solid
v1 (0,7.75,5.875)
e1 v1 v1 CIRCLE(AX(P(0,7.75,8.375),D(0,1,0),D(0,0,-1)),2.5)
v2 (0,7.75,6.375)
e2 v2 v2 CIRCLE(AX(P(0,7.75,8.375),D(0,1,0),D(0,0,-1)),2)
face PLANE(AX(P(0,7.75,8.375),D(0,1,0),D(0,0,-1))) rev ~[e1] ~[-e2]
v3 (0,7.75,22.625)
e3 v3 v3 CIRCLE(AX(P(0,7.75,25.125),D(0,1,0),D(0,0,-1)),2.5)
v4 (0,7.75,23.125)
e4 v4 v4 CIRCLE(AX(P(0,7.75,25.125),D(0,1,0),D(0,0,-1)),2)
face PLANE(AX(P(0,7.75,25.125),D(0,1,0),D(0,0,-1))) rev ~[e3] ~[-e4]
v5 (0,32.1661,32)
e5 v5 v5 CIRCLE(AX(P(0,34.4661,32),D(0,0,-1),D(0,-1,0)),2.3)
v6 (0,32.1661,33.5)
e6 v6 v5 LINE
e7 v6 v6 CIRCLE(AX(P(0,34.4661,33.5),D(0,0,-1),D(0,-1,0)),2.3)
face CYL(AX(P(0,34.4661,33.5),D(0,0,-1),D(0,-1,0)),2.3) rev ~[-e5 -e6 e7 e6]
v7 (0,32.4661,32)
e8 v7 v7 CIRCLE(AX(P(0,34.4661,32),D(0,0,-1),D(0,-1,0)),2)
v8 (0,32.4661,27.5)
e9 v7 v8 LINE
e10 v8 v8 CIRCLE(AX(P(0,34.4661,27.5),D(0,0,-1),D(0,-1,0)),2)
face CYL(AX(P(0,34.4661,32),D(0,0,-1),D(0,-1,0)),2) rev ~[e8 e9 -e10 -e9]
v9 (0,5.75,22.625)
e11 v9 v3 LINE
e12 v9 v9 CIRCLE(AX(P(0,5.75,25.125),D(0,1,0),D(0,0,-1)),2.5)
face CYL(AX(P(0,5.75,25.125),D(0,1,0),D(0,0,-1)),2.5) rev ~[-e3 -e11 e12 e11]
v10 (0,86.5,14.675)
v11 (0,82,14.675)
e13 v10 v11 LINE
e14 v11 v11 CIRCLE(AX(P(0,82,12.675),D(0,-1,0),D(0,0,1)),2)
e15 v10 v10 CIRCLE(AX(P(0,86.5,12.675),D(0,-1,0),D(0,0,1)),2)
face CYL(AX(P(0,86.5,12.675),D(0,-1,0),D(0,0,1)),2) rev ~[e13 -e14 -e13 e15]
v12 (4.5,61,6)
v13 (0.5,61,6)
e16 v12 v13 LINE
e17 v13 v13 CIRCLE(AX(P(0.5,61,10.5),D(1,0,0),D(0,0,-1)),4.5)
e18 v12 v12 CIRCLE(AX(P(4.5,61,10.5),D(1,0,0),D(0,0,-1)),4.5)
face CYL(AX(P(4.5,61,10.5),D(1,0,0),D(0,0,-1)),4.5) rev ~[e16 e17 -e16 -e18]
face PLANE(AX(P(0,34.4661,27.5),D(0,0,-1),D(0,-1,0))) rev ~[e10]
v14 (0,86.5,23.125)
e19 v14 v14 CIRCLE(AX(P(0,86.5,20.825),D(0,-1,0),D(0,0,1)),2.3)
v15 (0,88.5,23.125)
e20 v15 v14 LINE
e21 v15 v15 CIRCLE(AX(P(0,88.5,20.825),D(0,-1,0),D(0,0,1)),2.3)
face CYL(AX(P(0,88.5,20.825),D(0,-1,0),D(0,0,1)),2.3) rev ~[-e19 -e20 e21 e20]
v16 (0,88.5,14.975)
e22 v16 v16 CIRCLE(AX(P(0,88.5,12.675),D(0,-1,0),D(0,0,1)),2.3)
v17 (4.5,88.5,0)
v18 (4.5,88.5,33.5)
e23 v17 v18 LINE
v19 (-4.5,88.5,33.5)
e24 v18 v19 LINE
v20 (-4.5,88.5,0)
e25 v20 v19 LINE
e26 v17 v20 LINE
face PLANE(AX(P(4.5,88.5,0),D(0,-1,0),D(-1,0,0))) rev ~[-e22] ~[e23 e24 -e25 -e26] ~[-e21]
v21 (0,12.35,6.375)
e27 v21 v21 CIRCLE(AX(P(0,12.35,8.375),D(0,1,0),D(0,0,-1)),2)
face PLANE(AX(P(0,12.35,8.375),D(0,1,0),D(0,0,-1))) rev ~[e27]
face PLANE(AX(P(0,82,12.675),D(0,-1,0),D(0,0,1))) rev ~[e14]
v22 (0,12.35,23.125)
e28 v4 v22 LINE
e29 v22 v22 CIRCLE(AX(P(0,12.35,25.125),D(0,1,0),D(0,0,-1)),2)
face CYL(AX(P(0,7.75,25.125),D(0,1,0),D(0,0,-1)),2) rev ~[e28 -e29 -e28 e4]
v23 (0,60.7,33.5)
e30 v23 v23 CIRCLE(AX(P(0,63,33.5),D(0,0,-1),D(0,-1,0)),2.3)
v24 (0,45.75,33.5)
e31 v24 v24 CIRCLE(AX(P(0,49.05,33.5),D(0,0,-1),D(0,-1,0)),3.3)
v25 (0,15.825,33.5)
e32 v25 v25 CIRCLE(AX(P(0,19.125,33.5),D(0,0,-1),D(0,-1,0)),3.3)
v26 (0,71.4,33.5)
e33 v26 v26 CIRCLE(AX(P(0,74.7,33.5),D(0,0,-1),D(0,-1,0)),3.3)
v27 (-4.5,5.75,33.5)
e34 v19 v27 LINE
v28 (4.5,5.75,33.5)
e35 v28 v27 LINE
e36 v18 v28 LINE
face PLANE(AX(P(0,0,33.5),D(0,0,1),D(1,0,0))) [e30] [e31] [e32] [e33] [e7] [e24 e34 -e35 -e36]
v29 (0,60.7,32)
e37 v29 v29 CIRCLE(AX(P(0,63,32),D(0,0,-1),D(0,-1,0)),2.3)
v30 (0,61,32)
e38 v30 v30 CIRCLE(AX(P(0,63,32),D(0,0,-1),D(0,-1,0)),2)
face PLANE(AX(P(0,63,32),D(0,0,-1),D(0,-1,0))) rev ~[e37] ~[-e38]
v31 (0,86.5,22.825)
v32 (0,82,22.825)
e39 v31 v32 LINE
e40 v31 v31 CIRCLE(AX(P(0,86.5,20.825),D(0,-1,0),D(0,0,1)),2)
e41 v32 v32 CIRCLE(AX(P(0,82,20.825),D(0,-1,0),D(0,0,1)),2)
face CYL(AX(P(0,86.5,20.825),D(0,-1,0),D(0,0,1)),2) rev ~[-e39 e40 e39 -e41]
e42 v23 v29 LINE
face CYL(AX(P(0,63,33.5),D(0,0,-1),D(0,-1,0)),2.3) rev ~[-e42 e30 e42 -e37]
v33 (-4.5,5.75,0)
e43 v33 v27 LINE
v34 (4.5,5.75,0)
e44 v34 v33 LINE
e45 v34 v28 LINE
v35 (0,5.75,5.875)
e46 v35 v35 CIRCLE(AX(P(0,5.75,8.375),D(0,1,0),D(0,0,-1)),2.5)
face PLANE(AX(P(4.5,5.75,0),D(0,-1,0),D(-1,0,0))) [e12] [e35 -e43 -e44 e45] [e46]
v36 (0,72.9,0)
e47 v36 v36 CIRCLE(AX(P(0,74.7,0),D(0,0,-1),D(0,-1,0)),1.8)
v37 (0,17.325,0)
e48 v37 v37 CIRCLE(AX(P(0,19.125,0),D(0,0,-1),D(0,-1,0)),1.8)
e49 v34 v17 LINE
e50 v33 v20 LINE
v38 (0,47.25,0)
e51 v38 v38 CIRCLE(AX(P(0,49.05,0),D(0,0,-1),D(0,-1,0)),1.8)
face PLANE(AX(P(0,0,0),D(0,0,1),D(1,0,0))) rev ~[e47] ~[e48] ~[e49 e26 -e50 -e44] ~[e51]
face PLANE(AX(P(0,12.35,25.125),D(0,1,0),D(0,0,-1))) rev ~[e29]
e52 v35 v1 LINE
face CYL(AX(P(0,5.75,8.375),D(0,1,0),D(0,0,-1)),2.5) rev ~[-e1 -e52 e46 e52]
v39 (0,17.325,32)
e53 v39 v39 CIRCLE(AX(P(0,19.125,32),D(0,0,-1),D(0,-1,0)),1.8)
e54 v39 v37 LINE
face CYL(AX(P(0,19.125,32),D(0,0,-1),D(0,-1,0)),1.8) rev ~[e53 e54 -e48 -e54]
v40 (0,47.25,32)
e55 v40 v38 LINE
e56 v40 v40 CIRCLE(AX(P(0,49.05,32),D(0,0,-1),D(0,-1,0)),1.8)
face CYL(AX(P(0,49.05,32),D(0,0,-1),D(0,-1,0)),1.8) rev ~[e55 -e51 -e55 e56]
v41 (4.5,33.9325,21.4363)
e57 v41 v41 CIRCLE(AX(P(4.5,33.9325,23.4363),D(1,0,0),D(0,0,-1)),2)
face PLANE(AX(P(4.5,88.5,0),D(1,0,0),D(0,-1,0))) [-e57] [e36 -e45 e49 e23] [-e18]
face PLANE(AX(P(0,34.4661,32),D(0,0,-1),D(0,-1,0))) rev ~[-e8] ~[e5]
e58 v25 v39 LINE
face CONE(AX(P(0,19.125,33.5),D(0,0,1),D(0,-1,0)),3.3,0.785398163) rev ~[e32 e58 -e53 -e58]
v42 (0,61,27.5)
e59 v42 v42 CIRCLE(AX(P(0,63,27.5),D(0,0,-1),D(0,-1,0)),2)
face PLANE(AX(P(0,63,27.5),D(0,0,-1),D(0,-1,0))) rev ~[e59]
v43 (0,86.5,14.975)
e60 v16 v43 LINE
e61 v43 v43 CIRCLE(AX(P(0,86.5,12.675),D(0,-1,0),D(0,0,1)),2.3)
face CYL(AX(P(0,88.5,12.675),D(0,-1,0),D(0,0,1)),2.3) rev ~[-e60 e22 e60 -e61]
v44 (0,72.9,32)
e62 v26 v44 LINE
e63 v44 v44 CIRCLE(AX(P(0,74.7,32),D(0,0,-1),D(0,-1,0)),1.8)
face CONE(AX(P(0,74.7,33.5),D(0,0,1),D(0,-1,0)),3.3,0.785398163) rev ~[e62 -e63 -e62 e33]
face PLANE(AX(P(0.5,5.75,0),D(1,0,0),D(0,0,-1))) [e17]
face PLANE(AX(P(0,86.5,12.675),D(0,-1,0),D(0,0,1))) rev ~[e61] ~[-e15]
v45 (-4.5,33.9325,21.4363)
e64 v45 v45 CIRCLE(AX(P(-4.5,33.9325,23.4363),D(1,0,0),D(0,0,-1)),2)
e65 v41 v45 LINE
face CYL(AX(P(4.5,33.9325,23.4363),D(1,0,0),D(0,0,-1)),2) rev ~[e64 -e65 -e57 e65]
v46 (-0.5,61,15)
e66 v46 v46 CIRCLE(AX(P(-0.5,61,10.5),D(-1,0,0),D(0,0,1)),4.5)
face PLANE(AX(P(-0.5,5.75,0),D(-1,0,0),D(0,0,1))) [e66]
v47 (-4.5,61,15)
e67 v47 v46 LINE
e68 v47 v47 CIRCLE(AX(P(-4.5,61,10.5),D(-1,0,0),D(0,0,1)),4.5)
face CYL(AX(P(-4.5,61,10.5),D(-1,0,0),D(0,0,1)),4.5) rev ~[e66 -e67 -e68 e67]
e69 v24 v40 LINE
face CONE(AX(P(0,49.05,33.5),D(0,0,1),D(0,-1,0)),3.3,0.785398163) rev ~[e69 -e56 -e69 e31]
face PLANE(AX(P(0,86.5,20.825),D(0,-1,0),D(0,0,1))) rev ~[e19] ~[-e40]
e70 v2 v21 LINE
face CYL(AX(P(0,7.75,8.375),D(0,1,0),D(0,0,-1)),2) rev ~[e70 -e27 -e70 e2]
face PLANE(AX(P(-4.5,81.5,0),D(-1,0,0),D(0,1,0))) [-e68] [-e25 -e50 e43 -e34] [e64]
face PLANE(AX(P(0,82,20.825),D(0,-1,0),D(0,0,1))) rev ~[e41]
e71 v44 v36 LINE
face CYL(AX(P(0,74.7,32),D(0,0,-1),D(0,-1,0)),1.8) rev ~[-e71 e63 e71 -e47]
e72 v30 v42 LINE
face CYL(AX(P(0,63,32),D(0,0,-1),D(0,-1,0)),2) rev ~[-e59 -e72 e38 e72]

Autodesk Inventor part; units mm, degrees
ref_plane "YZ Plane" through (0, 0, 0) normal (1, 0, 0) x (0, 1, 0)
ref_plane "XZ Plane" through (0, 0, 0) normal (0, 1, 0) x (-1, 0, 0)
ref_plane "Work Plane1" through (0, 0, 0) normal (0, 0, 1) x (1, 0, 0)
ref_plane "Work Plane2" through (-89, -40.3889, 33.5) normal (0, 0, 1) x (1, 0, 0)
sketch "Sketch1" plane through (0, 0, 0) normal (0, 0, 1) x (1, 0, 0)
  line L0 (23.5, 88.5) -> (-23.5, 88.5) projected
  line L1 (-23.5, 88.5) -> (-23.5, 36.5) projected
  line L2 (-26.5, 33.5) -> (-89, 33.5) projected
  line L3 (-89, 33.5) -> (-89, -72.5) projected
  line L4 (-89, -72.5) -> (-77, -72.5) projected
  line L5 (-74, -75.5) -> (-74, -93.5) projected
  line L6 (-74, -93.5) -> (74, -93.5) projected
  line L7 (74, -93.5) -> (74, -75.5) projected
  line L8 (77, -72.5) -> (89, -72.5) projected
  line L9 (89, -72.5) -> (89, 33.5) projected
  line L10 (89, 33.5) -> (26.5, 33.5) projected
  line L11 (23.5, 36.5) -> (23.5, 88.5) projected
  line L12 (-4.5, 81.5) -> (-4.5, 36.5) projected
  line L13 (-7.5, 33.5) -> (-13.5, 33.5) projected
  line L14 (-16.5, 36.5) -> (-16.5, 81.5) projected
  line L15 (7.5, 84.5) -> (13.5, 84.5) projected
  line L16 (16.5, 81.5) -> (16.5, 36.5) projected
  line L17 (13.5, 33.5) -> (7.5, 33.5) projected
  line L18 (4.5, 36.5) -> (4.5, 81.5) projected
  line L19 (-13.5, 84.5) -> (-7.5, 84.5) projected
  line L20 (-4.5, 88.5) -> (4.5, 88.5)
  line L21 (4.5, 88.5) -> (4.5, 5.75)
  line L22 (4.5, 5.75) -> (-4.5, 5.75)
  line L23 (-4.5, 5.75) -> (-4.5, 88.5)
  line L24 (-32.2, 4.75) -> (-59.9, 4.75)
  arc A0 (13.5, 33.5) -> (16.5, 36.5) centre (13.5, 36.5) ccw projected
  arc A1 (4.5, 36.5) -> (7.5, 33.5) centre (7.5, 36.5) ccw projected
  arc A2 (7.5, 84.5) -> (4.5, 81.5) centre (7.5, 81.5) ccw projected
  arc A3 (16.5, 81.5) -> (13.5, 84.5) centre (13.5, 81.5) ccw projected
  arc A4 (-4.5, 81.5) -> (-7.5, 84.5) centre (-7.5, 81.5) ccw projected
  arc A5 (-7.5, 33.5) -> (-4.5, 36.5) centre (-7.5, 36.5) ccw projected
  arc A6 (-16.5, 36.5) -> (-13.5, 33.5) centre (-13.5, 36.5) ccw projected
  arc A7 (-13.5, 84.5) -> (-16.5, 81.5) centre (-13.5, 81.5) ccw projected
  arc A8 (-26.5, 33.5) -> (-23.5, 36.5) centre (-26.5, 36.5) ccw projected
  arc A9 (-74, -75.5) -> (-77, -72.5) centre (-77, -75.5) ccw projected
  arc A10 (77, -72.5) -> (74, -75.5) centre (77, -75.5) ccw projected
  arc A11 (23.5, 36.5) -> (26.5, 33.5) centre (26.5, 36.5) ccw projected
  circle A12 centre (21.5, -85.5) radius 1.8 projected
  circle A13 centre (-64.5, -85.5) radius 1.8 projected
  circle A14 centre (83.4, -16.3889) radius 1.8 projected
  circle A15 centre (-83.4, -19.2889) radius 1.8 projected
  circle A16 centre (-21.5, -85.5) radius 1.8 projected
  circle A17 centre (64.5, -85.5) radius 1.8 projected
  circle A18 centre (-56.0375, 15.0937) radius 1.0065 projected
  circle A19 centre (39.125, 4.3375) radius 1.0065 projected
  circle A20 centre (-72.95, 4.275) radius 1.0065 projected
  circle A21 centre (39.125, 25.9125) radius 1.0065 projected
  circle A22 centre (72.95, 12.275) radius 1.0065 projected
  circle A23 centre (86, 30.5) radius 1.0065 projected
  circle A24 centre (-86, 30.5) radius 1.0065 projected
  circle A25 centre (-39.125, 12.3375) radius 1.0065 projected
  circle A26 centre (-72.95, 25.975) radius 1.0065 projected
  circle A27 centre (-72.95, 12.275) radius 1.0065 projected
  circle A28 centre (-39.125, 25.9125) radius 1.0065 projected
  circle A29 centre (-86, 7.75) radius 1.0065 projected
  circle A30 centre (86, 7.75) radius 1.0065 projected
  circle A31 centre (72.95, 25.975) radius 1.0065 projected
  circle A32 centre (39.125, 12.3375) radius 1.0065 projected
  circle A33 centre (-39.125, 4.3375) radius 1.0065 projected
  circle A34 centre (72.95, 4.275) radius 1.0065 projected
  circle A35 centre (56.0375, 15.125) radius 1.0065 projected
  circle A36 centre (78, -67.1725) radius 1.2295 projected
  circle A37 centre (-24.1, -73.1) radius 1.2295 projected
  circle A38 centre (24.1, -24.9) radius 1.2295 projected
  circle A39 centre (-42.4984, -44.6666) radius 1.2295 projected
  circle A40 centre (-79, -42.3889) radius 1.2295 projected
  circle A41 centre (-19.5, 28.875) radius 1.2295 projected
  circle A42 centre (19.5, 9.55) radius 1.2295 projected
  circle A43 centre (19.5, 47.3) radius 1.2295 projected
  circle A44 centre (-19.5, 47.3) radius 1.2295 projected
  circle A45 centre (0, 74.7) radius 1.2295 projected
  circle A46 centre (-19.4231, 74.8077) radius 1.2295 projected
  circle A47 centre (19.5, 74.7) radius 1.2295 projected
  circle A48 centre (0, 49.05) radius 1.2295 projected
  circle A49 centre (19.5, 28.875) radius 1.2295 projected
  circle A50 centre (0, 19.125) radius 1.2295 projected
  circle A51 centre (-19.5, 9.55) radius 1.2295 projected
  circle A52 centre (-78, -67.1725) radius 1.2295 projected
  circle A53 centre (-24.1, -24.9) radius 1.2295 projected
  circle A54 centre (24.1, -73.1) radius 1.2295 projected
  circle A55 centre (42.5, -44.6649) radius 1.2295 projected
  circle A56 centre (79, -42.3889) radius 1.2295 projected
  point P0 (0, 0)
  point P1 (-4.5, 81.5)
  point P2 (-4.5, 36.5)
  point P3 (7.5, 81.5)
  point P4 (13.5, 81.5)
  point P5 (-7.5, 81.5)
  point P6 (-13.5, 81.5)
  dimension "d41" = 1
extrude "Extrusion1" add sketch "Sketch1" along normal up to surface (33.5 mm away) contours L21 L18 L22 L23 L12 L0 | A45 | A48 | A50
sketch "Sketch2" plane through (4.5, 5.75, 0) normal (1, 0, 0) x (0, 0, -1)
  circle A0 centre (-23.4363, 28.1825) radius 2 projected
  point P0 (0, -5.75)
extrude "Extrusion2" cut sketch "Sketch2" against normal blind 10
sketch "Sketch3" plane through (4.5, 5.75, 0) normal (1, 0, 0) x (0, 0, -1)
  circle A0 centre (-10.5, 55.25) radius 4.5 projected
  point P0 (0, -5.75)
extrude "Extrusion3" cut sketch "Sketch3" against normal blind 4
sketch "Sketch4" plane through (-4.5, 5.75, 0) normal (-1, 0, 0) x (0, 0, 1)
  circle A0 centre (10.5, 55.25) radius 4.5 projected
  point P0 (0, -5.75)
extrude "Extrusion4" cut sketch "Sketch4" against normal blind 4
sketch "Sketch5" plane through (-4.5, 5.75, 33.5) normal (0, 0, 1) x (1, 0, 0)
  line L0 (5, 59.75) -> (5, 50.75) projected
  line L1 (4, 50.75) -> (4, 59.75) projected
  line L2 (9, 26.1825) -> (0, 26.1825) projected
  line L3 (9, 30.1825) -> (0, 30.1825) projected
  line L4 (17, 78.15) -> (-8, 78.15)
  line L5 (-8, 35.85) -> (17, 35.85)
  line L6 (9, 82.75) -> (9, 0) projected
  line L7 (0, 50.75) -> (0, 59.75) projected
  line L8 (9, 35.85) -> (0, 35.85)
  line L9 (0, 35.85) -> (0, 50.75)
  line L10 (0, 50.75) -> (9, 50.75)
  line L11 (9, 50.75) -> (9, 35.85)
  line L12 (0, 0) -> (0, 82.75) projected
  line L13 (9, 78.15) -> (0, 78.15)
  line L14 (0, 78.15) -> (0, 59.75)
  line L15 (0, 59.75) -> (9, 59.75)
  line L16 (9, 59.75) -> (9, 78.15)
  line L17 (-18, 6.625) -> (-18, 20.125) projected
  line L18 (-18, 13.375) -> (27, 13.375)
  line L19 (9, 35.85) -> (0, 50.75)
  line L20 (9, 59.75) -> (9, 50.75) projected
  line L21 (0, 35.85) -> (9, 50.75)
  line L22 (9, 59.75) -> (0, 78.15)
  line L23 (0, 59.75) -> (9, 78.15)
  point P0 (4.5, -5.75)
  point P1 (4.5, 13.375)
  point P2 (4.5, 43.3)
  point P3 (4.5, 68.95)
  dimension "d9" = 4.5
  dimension "d10" = 4.5
hole "Hole1" at (0, 19.125, 33.5) at (0, 49.05, 33.5) at (0, 74.7, 33.5) direction (0, 0, -1) diameter 3.6 end through all countersink diameter 6.6 countersink angle 90 clearance for "Countersunk Flat Head Screw ISO 2009/7046" size "M3" standard "ISO"
sketch "Sketch6" plane through (-4.5, 5.75, 0) normal (0, -1, 0) x (1, 0, 0)
  line L0 (9, 33.5) -> (0, 33.5) projected
  line L1 (0, 0) -> (0, 33.5) projected
  line L2 (0, 0) -> (9, 0) projected
  line L3 (9, 0) -> (9, 33.5) projected
  line L4 (0, 16.75) -> (9, 16.75)
  line L5 (9, 16.75) -> (0, 33.5)
  line L6 (9, 33.5) -> (0, 16.75)
  line L7 (0, 16.75) -> (9, 0)
  line L8 (9, 16.75) -> (0, 0)
  point P0 (4.5, 0)
  point P1 (4.5, 8.375)
  point P2 (4.5, 25.125)
hole "Hole2" at (0, 5.75, 8.375) at (0, 5.75, 25.125) direction (0, 1, 0) diameter 4 depth 6.6 counterbore diameter 5 counterbore depth 2
sketch "Sketch7" plane through (-4.5, 88.5, 0) normal (0, 1, 0) x (1, 0, 0)
  line L0 (0, -33.5) -> (9, -33.5) projected
  line L1 (0, -33.5) -> (9, -33.5) projected
  line L2 (9, 0) -> (9, -33.5) projected
  line L3 (9, 0) -> (0, 0) projected
  line L4 (0, 0) -> (0, -33.5) projected
  line L5 (-8, -1.4) -> (-8, -6.6) projected
  line L6 (-8, -32.1) -> (-8, -26.9) projected
  line L7 (17, -32.1) -> (17, -26.9) projected
  line L8 (17, -1.4) -> (17, -6.6) projected
  line L9 (17, -32.1) -> (-8, -32.1)
  line L10 (-8, -32.1) -> (-8, -26.9)
  line L11 (-8, -26.9) -> (17, -26.9)
  line L12 (17, -26.9) -> (17, -32.1)
  line L13 (-8, -6.6) -> (17, -6.6)
  line L14 (17, -6.6) -> (17, -1.4)
  line L15 (17, -1.4) -> (-8, -1.4)
  line L16 (-8, -1.4) -> (-8, -6.6)
  line L17 (17, -6.6) -> (-8, -6.6)
  line L18 (-8, -6.6) -> (-8, -8.6)
  line L19 (-8, -8.6) -> (17, -8.6)
  line L20 (17, -8.6) -> (17, -6.6)
  line L21 (-8, -26.9) -> (17, -26.9)
  line L22 (17, -26.9) -> (17, -24.9)
  line L23 (17, -24.9) -> (-8, -24.9)
  line L24 (-8, -24.9) -> (-8, -26.9)
  line L25 (9, 0) -> (9, -33.5) projected
  line L26 (9, -16.75) -> (0, -16.75)
  line L27 (0, 0) -> (0, -33.5) projected
  line L28 (9, -24.9) -> (0, -16.75)
  line L29 (9, -8.6) -> (0, -16.75)
  line L30 (0, -8.6) -> (9, -16.75)
  line L31 (9, -16.75) -> (0, -24.9)
  point P0 (4.5, 0)
  point P1 (4.5, -20.825)
  point P2 (4.5, -12.675)
  dimension "d25" = 2
  dimension "d26" = 2
hole "Hole3" at (0, 88.5, 20.825) at (0, 88.5, 12.675) direction (0, -1, 0) diameter 4 depth 6.5 counterbore diameter 4.6 counterbore depth 2
sketch "Sketch8" plane through (-4.5, 5.75, 33.5) normal (0, 0, 1) x (1, 0, 0)
  line L0 (26, 27.2497) -> (-17, 27.2497)
  line L1 (26, 31.2497) -> (-17, 31.2497)
  line L2 (4, 52.75) -> (-1, 52.75)
  line L3 (4, 61.75) -> (-1, 61.75)
  line L4 (10, 61.75) -> (5, 61.75)
  line L5 (9, 50.75) -> (5, 50.75) projected
  line L6 (0, 0) -> (0, 82.75) projected
  line L7 (9, 52.75) -> (0, 52.75)
  line L8 (0, 52.75) -> (0, 61.75)
  line L9 (0, 61.75) -> (9, 61.75)
  line L10 (9, 61.75) -> (9, 50.75)
  line L11 (9, 26.1825) -> (0, 26.1825) projected
  line L12 (0, 31.2497) -> (9, 31.2497)
  line L13 (9, 31.2497) -> (9, 26.1825)
  line L14 (9, 26.1825) -> (0, 26.1825)
  line L15 (0, 26.1825) -> (0, 31.2497)
  line L16 (9, 26.1825) -> (0, 31.2497)
  line L17 (0, 26.1825) -> (9, 31.2497)
  line L18 (10, 51.75) -> (0, 61.75)
  line L19 (0, 52.75) -> (9, 61.75)
  point P0 (4.5, -5.75)
  point P1 (4.5, 28.7161)
  point P2 (4.5, 57.25)
hole "Hole4" at (0, 34.4661, 33.5) at (0, 63, 33.5) direction (0, 0, -1) diameter 4 depth 6 counterbore diameter 4.6 counterbore depth 1.5
equation "\"d9\" = d10"
properties part number "middle_gear_holder" material "Nylon 6/6"
